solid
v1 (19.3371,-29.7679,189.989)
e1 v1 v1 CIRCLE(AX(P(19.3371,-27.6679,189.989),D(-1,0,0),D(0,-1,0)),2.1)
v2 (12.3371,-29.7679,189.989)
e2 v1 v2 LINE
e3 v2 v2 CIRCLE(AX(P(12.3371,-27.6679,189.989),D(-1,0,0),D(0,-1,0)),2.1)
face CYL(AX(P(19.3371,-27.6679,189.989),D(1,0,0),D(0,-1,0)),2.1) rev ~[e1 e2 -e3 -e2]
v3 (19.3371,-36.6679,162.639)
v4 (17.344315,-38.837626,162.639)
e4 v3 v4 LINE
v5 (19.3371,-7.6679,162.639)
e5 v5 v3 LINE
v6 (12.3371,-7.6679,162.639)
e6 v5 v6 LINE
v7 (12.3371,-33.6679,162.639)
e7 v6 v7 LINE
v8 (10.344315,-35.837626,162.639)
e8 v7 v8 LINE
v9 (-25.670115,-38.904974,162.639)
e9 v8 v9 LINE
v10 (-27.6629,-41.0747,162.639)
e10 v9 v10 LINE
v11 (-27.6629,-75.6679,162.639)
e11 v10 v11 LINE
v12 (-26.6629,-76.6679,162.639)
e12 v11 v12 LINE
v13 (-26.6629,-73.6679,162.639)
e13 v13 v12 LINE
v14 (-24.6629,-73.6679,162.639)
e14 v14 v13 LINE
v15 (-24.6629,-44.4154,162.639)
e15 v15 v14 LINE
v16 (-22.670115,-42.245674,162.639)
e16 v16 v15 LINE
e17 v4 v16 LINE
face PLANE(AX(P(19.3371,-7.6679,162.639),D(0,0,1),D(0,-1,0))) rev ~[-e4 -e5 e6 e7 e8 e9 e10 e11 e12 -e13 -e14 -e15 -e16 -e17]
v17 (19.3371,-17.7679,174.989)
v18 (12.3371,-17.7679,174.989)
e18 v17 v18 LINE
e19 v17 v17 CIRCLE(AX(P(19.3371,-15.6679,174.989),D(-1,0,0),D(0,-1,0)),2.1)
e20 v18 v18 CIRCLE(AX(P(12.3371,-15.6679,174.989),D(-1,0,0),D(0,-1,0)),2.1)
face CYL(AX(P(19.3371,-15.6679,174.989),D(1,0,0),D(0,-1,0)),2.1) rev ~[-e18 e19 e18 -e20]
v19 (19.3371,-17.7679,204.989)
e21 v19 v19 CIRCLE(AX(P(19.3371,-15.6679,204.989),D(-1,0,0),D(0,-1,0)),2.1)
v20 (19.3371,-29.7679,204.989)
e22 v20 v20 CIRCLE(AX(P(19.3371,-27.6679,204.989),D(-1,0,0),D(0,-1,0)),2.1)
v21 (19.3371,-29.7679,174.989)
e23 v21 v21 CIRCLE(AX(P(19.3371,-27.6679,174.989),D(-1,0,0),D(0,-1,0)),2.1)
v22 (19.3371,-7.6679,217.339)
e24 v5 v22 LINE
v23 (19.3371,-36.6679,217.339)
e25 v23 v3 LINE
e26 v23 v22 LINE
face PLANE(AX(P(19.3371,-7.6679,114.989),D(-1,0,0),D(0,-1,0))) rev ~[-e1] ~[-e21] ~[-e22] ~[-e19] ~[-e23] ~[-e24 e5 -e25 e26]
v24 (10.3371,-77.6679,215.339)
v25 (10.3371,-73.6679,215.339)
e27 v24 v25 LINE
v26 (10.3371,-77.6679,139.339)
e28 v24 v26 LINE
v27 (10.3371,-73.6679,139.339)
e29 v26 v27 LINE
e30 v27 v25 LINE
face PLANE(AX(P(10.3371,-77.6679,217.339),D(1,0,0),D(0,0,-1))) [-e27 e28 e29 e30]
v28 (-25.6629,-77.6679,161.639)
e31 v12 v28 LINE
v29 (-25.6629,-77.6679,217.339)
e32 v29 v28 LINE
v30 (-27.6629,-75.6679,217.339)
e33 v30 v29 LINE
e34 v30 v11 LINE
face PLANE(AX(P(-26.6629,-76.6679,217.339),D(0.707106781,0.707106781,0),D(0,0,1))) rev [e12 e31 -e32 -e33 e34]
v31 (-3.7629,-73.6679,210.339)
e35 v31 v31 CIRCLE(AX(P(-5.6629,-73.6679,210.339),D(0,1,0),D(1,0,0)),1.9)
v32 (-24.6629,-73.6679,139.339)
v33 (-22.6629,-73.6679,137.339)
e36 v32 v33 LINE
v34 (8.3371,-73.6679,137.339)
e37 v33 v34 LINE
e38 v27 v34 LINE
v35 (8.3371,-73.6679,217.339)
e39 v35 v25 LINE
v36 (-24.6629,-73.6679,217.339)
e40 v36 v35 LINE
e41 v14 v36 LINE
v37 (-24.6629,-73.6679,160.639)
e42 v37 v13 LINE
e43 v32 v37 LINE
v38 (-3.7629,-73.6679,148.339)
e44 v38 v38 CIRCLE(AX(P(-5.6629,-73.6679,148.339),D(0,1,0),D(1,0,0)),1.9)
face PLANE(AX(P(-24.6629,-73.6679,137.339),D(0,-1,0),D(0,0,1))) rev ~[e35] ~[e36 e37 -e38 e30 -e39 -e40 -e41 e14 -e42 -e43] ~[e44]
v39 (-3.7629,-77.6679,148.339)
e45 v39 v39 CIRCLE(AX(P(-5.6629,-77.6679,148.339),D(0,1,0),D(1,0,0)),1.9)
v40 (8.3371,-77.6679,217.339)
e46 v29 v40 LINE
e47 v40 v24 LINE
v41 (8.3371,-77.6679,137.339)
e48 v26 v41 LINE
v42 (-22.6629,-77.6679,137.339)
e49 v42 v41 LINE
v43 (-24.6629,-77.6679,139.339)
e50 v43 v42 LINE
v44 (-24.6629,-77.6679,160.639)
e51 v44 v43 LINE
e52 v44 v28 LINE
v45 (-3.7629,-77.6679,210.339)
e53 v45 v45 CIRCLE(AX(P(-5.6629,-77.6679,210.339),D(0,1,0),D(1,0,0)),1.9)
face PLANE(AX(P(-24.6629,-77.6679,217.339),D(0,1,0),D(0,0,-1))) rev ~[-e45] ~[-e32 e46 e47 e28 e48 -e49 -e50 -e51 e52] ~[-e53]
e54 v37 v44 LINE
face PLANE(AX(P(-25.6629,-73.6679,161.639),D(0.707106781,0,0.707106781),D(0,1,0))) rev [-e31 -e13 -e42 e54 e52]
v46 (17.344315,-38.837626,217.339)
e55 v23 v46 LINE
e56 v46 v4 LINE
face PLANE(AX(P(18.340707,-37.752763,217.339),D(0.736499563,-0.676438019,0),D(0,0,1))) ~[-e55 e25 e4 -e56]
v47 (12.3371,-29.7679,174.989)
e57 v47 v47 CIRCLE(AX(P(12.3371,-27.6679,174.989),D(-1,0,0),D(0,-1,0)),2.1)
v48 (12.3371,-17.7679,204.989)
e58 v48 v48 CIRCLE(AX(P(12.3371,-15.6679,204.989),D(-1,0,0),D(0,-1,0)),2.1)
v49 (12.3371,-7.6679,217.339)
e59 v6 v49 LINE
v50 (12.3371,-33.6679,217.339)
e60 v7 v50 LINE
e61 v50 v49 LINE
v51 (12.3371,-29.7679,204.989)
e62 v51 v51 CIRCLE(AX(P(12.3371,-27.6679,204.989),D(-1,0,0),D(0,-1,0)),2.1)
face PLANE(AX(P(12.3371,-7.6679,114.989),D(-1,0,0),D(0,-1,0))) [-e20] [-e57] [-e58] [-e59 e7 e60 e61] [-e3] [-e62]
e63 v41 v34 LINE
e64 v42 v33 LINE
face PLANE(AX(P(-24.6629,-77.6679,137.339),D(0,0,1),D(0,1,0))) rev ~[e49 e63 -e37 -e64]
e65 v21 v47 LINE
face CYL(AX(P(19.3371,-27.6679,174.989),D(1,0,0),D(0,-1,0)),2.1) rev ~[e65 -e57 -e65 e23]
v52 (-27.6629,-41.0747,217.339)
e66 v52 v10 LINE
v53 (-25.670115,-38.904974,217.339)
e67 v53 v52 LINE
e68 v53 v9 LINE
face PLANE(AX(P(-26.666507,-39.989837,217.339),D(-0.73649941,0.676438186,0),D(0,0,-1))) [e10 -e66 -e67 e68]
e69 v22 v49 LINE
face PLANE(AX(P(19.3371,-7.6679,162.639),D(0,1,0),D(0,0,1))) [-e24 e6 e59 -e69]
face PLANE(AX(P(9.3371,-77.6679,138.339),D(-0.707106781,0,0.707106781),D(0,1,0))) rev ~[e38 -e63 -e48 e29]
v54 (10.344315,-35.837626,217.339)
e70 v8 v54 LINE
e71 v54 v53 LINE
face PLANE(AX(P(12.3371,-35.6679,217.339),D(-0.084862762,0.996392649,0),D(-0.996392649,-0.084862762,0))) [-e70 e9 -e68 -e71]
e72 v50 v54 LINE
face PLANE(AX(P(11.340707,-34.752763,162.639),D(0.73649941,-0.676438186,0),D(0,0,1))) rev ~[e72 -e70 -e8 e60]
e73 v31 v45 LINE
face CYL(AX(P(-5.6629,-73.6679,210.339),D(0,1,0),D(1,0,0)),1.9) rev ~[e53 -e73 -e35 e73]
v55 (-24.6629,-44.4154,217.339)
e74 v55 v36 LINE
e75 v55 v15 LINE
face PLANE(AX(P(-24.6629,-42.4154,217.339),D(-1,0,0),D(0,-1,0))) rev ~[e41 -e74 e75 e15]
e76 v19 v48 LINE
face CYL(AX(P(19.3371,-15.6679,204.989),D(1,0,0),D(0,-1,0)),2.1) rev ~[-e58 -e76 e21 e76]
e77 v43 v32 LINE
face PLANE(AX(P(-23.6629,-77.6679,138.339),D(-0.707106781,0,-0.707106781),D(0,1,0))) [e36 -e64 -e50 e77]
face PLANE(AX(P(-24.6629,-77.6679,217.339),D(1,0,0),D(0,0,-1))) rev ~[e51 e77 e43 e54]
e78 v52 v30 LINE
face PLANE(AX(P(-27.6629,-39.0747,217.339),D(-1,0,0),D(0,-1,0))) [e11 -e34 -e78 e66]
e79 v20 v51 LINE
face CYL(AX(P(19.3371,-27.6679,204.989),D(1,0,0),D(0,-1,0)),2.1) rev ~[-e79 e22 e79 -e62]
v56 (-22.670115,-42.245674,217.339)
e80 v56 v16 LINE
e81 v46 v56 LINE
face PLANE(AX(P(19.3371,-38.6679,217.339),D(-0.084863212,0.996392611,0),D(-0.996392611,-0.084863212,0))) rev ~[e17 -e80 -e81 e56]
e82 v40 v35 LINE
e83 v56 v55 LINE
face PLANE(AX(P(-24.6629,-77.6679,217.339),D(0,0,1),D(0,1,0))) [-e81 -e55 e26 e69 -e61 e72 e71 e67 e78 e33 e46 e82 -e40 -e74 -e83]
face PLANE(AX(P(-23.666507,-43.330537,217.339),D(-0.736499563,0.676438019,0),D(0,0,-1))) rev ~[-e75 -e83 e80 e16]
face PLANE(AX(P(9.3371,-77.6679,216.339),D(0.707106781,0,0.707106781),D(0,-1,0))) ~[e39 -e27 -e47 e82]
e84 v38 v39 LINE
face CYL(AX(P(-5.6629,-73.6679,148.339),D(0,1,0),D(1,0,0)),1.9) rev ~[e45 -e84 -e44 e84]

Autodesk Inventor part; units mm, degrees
ref_plane "YZ Plane" through (0, 0, 0) normal (1, 0, 0) x (0, 1, 0)
ref_plane "XZ Plane" through (0, 0, 0) normal (0, 1, 0) x (-1, 0, 0)
ref_plane "XY Plane" through (0, 0, 0) normal (0, 0, 1) x (1, 0, 0)
ref_plane "工作平面1" through (19.3371, -7.6679, 114.989) normal (-1, 0, 0) x (0, -1, 0)
sketch "草图1" plane through (19.3371, -7.6679, 114.989) normal (-1, 0, 0) x (0, -1, 0)
  circle A0 centre (20, 75) radius 2.1
  circle A1 centre (20, 90) radius 2.1
  circle A2 centre (20, 60) radius 2.1
  circle A3 centre (8, 60) radius 2.1
  circle A4 centre (8, 90) radius 2.1
  line L0 (0, 0) -> (0, 214)
  circle A5 centre (12.0096, 5) radius 2.1
  circle A6 centre (25, 12.5) radius 2.1
  circle A7 centre (37.9904, 5) radius 2.1
  circle A8 centre (20, 75) radius 2.1
  circle A9 centre (20, 90) radius 2.1
  circle A10 centre (20, 60) radius 2.1
  circle A11 centre (8, 90) radius 2.1
  circle A12 centre (8, 60) radius 2.1
  circle A13 centre (15.7729, 200.5) radius 2.1
  circle A14 centre (28.7632, 208) radius 2.1
  circle A15 centre (28.7632, 178) radius 2.1
  circle A16 centre (15.7729, 185.5) radius 2.1
  circle A17 centre (41.7536, 200.5) radius 2.1
  circle A18 centre (41.7536, 185.5) radius 2.1
  circle A19 centre (28.7632, 193) radius 7.5
  arc A20 (48.2862, 199.5655) -> (25.6285, 214) centre (25.6285, 189) ccw
  line L1 (25.6285, 214) -> (0, 214)
  line L2 (0, 0) -> (0, 214)
  line L3 (0, 0) -> (64, 0)
  line L4 (64, 0) -> (64, 23)
  line L5 (66.8284, 25) -> (64, 23)
  line L6 (66.8284, 25) -> (70, 25)
  line L7 (70, 25) -> (70, 147.4576)
  arc A21 (70, 147.4576) -> (67.6577, 158.0231) centre (45, 147.4576) ccw
  line L8 (67.6577, 158.0231) -> (48.2862, 199.5655)
  circle A22 centre (64.4234, 100.25) radius 2.1
  circle A23 centre (37.5766, 49.75) radius 2.1
  circle A24 centre (64.4234, 65.25) radius 2.1
  circle A25 centre (37.5766, 100.25) radius 2.1
  circle A26 centre (64.4234, 84.75) radius 2.1
  circle A27 centre (51, 42) radius 2.1
  circle A28 centre (64.4234, 49.75) radius 2.1
  circle A29 centre (51, 108) radius 2.1
  circle A30 centre (33.7425, 67) radius 3.25
  circle A31 centre (59, 75) radius 3.25
  circle A32 centre (33.7425, 83) radius 3.25
  circle A33 centre (50, 75) radius 3.25
  circle A34 centre (41, 75) radius 3.25
  line L9 (0, 47.65) -> (28, 47.65)
  line L10 (28, 47.65) -> (28, 102.35)
  line L11 (28, 102.35) -> (0, 102.35)
  line L12 (0, 102.35) -> (0, 47.65)
  point P0 (-7.6679, -114.989)
  point P1 (0, 102.35)
  point P2 (0, 47.65)
extrude "拉伸1" add sketch "草图1" along normal blind 7 contours L0 L11 L10 L9
sketch "草图2" plane through (19.3371, -35.6679, 217.339) normal (0, 0, 1) x (1, 0, 0)
  line L0 (-6, -42) -> (-116, -42) projected
  line L1 (-6, -42) -> (-43, -42)
  line L2 (-43, -42) -> (-43, -14)
  line L3 (-43, -14) -> (-6, -14)
  line L4 (-6, -14) -> (-6, -42)
  line L5 (-48, -3.4068) -> (-48, -11.4068) projected
  line L6 (-47, -3.4068) -> (-47, 27) projected
  line L7 (0, 0) -> (-7, 0) projected
  line L8 (-7, 0) -> (-47, -3.4068)
  line L9 (-47, -3.4068) -> (-47, -42)
  line L10 (0, 0) -> (0, -3)
  line L11 (0, -3) -> (-44, -6.7475)
  line L12 (-44, -6.7475) -> (-44, -42)
  point P0 (-19.3371, 35.6679)
  dimension "d3" = 37
  dimension "d4" = 28
  dimension "d5" = 3
  dimension "d6" = 3
extrude "拉伸2" add sketch "草图2" against normal up to surface (54.7 mm away) contours L0 L9 L8 L7 L10 L11 L12
chamfer "倒角1" distance 2 angle 45 1 edges at (-24.6629, -42.4154, 189.989)
sketch "草图3" plane through (-24.6629, -77.6679, 217.339) normal (1, 0, 0) x (0, 0, -1)
  line L0 (0, 0) -> (0, 33.2525) projected
  line L1 (0, 0) -> (80, 0)
  line L2 (80, 0) -> (80, 4)
  line L3 (80, 4) -> (0, 4)
  line L4 (0, 4) -> (0, 0)
  point P0 (217.339, 77.6679)
  point P1 (0, 4)
  dimension "d12" = 80
  dimension "d13" = 4
extrude "拉伸3" add sketch "草图3" along normal blind 35
chamfer "倒角2" distance 2 angle 45 8 edges at (10.3371, -75.6679, 217.339) (10.3371, -75.6679, 137.339) (-27.6629, -39.0748, 189.989) (-24.6629, -75.6679, 137.339) (-24.6629, -75.6679, 162.639) (12.3371, -35.6679, 189.989) (19.3371, -38.6679, 189.989) (-27.6629, -77.6679, 189.989)
sketch "草图4" plane through (-24.6629, -73.6679, 217.339) normal (0, 1, 0) x (1, 0, 0)
  line L0 (2, 80) -> (33, 80) projected
  line L1 (19, 80) -> (19, -0.4467) construction
  line L2 (0, 78) -> (0, 56.7) projected
  line L3 (44, -44.0038) -> (44, 260.8962) projected
  circle A0 centre (19, 69) radius 1.9
  circle A1 centre (19, 7) radius 1.9
  point P0 (24.6629, 217.339)
  dimension "d19" = 19
  dimension "d20" = 25
  dimension "d21" = 3.8
  dimension "d22" = 3.8
  dimension "d23" = 62
  dimension "d24" = 11
extrude "拉伸4" cut sketch "草图4" against normal blind 35
properties part number "电气支架_2"
